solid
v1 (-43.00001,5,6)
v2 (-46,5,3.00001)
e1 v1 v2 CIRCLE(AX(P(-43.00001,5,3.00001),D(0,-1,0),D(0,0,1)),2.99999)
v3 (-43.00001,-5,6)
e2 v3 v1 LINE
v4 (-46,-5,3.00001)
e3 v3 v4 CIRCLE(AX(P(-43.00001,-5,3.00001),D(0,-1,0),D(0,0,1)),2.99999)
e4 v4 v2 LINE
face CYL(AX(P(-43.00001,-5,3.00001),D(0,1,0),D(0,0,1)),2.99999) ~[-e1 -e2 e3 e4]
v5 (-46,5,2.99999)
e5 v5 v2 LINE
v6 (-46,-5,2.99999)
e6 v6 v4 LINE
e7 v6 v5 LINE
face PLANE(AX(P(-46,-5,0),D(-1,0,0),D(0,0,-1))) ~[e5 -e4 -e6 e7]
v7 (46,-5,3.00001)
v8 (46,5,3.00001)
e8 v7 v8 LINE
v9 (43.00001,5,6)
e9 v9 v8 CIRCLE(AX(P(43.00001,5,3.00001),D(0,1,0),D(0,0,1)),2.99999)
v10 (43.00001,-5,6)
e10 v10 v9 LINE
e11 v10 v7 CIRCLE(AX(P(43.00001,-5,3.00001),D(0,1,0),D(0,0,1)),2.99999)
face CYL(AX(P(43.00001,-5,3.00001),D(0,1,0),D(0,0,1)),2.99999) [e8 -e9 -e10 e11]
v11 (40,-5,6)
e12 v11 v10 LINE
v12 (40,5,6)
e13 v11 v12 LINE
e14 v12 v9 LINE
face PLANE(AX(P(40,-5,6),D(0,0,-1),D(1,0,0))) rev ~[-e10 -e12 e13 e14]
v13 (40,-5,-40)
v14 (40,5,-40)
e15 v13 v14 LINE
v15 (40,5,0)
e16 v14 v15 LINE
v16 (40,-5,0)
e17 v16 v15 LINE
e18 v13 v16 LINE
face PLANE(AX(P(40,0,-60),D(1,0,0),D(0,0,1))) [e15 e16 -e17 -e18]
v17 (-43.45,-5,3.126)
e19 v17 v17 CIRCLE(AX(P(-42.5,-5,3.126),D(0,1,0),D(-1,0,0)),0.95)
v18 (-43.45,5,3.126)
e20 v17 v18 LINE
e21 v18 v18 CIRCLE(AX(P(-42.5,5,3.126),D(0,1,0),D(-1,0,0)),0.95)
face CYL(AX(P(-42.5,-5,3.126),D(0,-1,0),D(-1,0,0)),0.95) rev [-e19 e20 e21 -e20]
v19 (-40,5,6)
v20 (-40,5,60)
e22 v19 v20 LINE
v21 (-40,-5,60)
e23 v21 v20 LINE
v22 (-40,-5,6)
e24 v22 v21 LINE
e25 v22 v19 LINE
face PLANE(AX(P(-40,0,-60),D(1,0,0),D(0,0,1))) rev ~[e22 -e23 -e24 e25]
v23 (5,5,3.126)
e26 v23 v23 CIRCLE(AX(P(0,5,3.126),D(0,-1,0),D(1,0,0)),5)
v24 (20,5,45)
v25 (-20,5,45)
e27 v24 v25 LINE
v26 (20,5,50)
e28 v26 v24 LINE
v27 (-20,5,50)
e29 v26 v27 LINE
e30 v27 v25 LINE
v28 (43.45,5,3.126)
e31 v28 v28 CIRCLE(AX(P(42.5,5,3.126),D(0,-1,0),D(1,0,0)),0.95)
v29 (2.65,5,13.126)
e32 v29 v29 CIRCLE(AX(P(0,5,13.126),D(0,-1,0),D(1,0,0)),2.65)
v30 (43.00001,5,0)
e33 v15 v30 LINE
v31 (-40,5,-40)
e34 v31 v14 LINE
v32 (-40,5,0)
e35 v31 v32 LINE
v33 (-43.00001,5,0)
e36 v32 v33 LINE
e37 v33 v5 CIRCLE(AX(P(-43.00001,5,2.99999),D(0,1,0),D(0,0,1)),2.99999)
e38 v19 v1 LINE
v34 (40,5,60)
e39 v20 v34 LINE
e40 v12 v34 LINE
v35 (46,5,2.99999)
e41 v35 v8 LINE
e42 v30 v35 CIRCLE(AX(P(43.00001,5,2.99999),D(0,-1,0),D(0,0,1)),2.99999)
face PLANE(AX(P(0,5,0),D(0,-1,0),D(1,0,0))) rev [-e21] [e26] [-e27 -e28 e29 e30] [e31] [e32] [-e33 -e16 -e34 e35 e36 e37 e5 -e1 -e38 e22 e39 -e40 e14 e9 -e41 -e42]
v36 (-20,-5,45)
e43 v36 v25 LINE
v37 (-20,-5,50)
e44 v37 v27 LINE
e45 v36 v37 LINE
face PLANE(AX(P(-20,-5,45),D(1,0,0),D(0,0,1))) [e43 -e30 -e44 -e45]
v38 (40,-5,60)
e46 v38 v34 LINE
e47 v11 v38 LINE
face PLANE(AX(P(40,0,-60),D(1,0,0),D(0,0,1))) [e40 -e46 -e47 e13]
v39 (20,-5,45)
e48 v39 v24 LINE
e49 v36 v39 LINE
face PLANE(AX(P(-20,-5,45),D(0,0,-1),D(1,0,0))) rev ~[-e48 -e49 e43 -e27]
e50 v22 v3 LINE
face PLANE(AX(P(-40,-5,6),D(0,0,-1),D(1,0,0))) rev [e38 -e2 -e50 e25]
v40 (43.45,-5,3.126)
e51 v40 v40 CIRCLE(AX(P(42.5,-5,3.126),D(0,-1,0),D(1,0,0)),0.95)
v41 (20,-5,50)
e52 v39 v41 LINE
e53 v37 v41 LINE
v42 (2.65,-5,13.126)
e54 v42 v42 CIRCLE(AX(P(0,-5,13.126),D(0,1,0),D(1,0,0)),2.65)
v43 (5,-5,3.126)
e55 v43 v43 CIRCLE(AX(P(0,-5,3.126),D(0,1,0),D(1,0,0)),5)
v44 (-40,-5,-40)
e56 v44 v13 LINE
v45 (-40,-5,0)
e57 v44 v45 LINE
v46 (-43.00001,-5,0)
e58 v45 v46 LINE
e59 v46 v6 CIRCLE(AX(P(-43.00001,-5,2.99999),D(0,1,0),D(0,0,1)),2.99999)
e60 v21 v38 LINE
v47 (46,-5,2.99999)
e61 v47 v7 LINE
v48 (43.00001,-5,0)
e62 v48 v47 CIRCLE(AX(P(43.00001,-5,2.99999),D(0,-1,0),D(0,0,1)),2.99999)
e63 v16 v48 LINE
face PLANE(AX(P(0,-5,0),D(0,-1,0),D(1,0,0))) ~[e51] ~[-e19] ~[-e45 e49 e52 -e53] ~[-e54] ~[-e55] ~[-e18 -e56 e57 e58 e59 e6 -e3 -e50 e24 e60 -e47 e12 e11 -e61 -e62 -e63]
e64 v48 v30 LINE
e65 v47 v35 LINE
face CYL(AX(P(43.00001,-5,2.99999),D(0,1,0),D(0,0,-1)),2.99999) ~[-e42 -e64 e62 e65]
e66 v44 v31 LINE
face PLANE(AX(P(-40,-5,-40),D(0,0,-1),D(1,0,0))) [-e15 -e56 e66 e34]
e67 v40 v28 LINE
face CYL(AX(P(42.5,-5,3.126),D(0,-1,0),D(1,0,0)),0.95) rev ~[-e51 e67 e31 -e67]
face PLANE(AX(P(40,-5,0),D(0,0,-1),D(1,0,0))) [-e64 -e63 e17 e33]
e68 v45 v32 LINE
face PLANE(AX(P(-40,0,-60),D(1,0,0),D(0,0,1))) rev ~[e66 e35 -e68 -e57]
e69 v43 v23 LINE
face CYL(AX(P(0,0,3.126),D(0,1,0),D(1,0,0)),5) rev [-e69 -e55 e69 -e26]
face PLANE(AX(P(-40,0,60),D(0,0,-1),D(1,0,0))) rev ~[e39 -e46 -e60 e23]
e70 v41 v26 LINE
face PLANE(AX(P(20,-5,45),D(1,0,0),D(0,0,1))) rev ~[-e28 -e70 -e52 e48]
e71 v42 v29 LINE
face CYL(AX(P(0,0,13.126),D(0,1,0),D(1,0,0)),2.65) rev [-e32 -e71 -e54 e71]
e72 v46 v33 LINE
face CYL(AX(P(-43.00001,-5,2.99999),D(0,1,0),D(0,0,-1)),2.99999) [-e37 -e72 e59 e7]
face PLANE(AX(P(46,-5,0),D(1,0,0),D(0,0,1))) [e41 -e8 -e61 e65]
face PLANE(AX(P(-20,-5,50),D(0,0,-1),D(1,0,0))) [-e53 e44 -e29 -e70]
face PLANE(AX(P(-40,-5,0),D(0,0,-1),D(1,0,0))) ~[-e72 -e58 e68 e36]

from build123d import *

# Parameters (mm, degrees)
F0_W           = 80
F0_H           = 120
F0_R           = 5
F0_R_2         = 2.65
F1_DEPTH       = 5
F2_W           = 80
F2_H           = 20
F3_DEPTH       = 10
F4_W           = 6
F4_H           = 6
F4_R           = 0.95
F5_DEPTH       = 10
F6_R           = 2.99999
F9_W           = 40
F9_H           = 5
F10_DEPTH      = 12
F10_DEPTH_BACK = 10


# Not quite as in the source:
# - a fillet or chamfer is up to 0.001 mm smaller than in the source, because OpenCascade refuses the exact size


with BuildPart() as f1:
    # F0 (on Front) → F1 (new body, symmetric)
    with BuildSketch(Plane.XZ):
        Rectangle(F0_W, F0_H)
        with Locations((0, 3.126)):
            Circle(F0_R, mode=Mode.SUBTRACT)
        with Locations((0, 13.126)):
            Circle(F0_R_2, mode=Mode.SUBTRACT)
    extrude(amount=F1_DEPTH, both=True)

    # F2 (on face) → F3 (cut)
    with BuildSketch(Plane.XZ.offset(5)):
        with Locations((0, -50)):
            Rectangle(F2_W, F2_H)
    extrude(amount=-F3_DEPTH, mode=Mode.SUBTRACT)

    # F4 (on face) → F5 (join)
    with BuildSketch(Plane.XZ.offset(5)):
        with Locations((43, 3)):
            Rectangle(F4_W, F4_H)
        with Locations((42.5, 3.126)):
            Circle(F4_R, mode=Mode.SUBTRACT)
    extrude(amount=-F5_DEPTH)

    # F6 (radius 3 in the source; OpenCascade refuses exactly that, so slightly less here)
    f6_edges = [f1.edges().sort_by_distance(p)[0] for p in [
        (46, 0, 0),
        (46, 0, 6),
    ]]
    fillet(f6_edges, radius=F6_R)

    # F7: F1 across plane


with BuildPart() as f1_1:
    add(f1.part)
    add(f1.part.mirror(Plane.YZ))

    # F9 (on face) → F10 (cut, two sides)
    with BuildSketch(Plane.XZ.offset(5)) as f10_sk:
        with Locations((0, 47.5)):
            Rectangle(F9_W, F9_H)
    extrude(amount=-F10_DEPTH, mode=Mode.SUBTRACT)
    extrude(f10_sk.sketch, amount=F10_DEPTH_BACK, mode=Mode.SUBTRACT)


solid = f1_1.part
